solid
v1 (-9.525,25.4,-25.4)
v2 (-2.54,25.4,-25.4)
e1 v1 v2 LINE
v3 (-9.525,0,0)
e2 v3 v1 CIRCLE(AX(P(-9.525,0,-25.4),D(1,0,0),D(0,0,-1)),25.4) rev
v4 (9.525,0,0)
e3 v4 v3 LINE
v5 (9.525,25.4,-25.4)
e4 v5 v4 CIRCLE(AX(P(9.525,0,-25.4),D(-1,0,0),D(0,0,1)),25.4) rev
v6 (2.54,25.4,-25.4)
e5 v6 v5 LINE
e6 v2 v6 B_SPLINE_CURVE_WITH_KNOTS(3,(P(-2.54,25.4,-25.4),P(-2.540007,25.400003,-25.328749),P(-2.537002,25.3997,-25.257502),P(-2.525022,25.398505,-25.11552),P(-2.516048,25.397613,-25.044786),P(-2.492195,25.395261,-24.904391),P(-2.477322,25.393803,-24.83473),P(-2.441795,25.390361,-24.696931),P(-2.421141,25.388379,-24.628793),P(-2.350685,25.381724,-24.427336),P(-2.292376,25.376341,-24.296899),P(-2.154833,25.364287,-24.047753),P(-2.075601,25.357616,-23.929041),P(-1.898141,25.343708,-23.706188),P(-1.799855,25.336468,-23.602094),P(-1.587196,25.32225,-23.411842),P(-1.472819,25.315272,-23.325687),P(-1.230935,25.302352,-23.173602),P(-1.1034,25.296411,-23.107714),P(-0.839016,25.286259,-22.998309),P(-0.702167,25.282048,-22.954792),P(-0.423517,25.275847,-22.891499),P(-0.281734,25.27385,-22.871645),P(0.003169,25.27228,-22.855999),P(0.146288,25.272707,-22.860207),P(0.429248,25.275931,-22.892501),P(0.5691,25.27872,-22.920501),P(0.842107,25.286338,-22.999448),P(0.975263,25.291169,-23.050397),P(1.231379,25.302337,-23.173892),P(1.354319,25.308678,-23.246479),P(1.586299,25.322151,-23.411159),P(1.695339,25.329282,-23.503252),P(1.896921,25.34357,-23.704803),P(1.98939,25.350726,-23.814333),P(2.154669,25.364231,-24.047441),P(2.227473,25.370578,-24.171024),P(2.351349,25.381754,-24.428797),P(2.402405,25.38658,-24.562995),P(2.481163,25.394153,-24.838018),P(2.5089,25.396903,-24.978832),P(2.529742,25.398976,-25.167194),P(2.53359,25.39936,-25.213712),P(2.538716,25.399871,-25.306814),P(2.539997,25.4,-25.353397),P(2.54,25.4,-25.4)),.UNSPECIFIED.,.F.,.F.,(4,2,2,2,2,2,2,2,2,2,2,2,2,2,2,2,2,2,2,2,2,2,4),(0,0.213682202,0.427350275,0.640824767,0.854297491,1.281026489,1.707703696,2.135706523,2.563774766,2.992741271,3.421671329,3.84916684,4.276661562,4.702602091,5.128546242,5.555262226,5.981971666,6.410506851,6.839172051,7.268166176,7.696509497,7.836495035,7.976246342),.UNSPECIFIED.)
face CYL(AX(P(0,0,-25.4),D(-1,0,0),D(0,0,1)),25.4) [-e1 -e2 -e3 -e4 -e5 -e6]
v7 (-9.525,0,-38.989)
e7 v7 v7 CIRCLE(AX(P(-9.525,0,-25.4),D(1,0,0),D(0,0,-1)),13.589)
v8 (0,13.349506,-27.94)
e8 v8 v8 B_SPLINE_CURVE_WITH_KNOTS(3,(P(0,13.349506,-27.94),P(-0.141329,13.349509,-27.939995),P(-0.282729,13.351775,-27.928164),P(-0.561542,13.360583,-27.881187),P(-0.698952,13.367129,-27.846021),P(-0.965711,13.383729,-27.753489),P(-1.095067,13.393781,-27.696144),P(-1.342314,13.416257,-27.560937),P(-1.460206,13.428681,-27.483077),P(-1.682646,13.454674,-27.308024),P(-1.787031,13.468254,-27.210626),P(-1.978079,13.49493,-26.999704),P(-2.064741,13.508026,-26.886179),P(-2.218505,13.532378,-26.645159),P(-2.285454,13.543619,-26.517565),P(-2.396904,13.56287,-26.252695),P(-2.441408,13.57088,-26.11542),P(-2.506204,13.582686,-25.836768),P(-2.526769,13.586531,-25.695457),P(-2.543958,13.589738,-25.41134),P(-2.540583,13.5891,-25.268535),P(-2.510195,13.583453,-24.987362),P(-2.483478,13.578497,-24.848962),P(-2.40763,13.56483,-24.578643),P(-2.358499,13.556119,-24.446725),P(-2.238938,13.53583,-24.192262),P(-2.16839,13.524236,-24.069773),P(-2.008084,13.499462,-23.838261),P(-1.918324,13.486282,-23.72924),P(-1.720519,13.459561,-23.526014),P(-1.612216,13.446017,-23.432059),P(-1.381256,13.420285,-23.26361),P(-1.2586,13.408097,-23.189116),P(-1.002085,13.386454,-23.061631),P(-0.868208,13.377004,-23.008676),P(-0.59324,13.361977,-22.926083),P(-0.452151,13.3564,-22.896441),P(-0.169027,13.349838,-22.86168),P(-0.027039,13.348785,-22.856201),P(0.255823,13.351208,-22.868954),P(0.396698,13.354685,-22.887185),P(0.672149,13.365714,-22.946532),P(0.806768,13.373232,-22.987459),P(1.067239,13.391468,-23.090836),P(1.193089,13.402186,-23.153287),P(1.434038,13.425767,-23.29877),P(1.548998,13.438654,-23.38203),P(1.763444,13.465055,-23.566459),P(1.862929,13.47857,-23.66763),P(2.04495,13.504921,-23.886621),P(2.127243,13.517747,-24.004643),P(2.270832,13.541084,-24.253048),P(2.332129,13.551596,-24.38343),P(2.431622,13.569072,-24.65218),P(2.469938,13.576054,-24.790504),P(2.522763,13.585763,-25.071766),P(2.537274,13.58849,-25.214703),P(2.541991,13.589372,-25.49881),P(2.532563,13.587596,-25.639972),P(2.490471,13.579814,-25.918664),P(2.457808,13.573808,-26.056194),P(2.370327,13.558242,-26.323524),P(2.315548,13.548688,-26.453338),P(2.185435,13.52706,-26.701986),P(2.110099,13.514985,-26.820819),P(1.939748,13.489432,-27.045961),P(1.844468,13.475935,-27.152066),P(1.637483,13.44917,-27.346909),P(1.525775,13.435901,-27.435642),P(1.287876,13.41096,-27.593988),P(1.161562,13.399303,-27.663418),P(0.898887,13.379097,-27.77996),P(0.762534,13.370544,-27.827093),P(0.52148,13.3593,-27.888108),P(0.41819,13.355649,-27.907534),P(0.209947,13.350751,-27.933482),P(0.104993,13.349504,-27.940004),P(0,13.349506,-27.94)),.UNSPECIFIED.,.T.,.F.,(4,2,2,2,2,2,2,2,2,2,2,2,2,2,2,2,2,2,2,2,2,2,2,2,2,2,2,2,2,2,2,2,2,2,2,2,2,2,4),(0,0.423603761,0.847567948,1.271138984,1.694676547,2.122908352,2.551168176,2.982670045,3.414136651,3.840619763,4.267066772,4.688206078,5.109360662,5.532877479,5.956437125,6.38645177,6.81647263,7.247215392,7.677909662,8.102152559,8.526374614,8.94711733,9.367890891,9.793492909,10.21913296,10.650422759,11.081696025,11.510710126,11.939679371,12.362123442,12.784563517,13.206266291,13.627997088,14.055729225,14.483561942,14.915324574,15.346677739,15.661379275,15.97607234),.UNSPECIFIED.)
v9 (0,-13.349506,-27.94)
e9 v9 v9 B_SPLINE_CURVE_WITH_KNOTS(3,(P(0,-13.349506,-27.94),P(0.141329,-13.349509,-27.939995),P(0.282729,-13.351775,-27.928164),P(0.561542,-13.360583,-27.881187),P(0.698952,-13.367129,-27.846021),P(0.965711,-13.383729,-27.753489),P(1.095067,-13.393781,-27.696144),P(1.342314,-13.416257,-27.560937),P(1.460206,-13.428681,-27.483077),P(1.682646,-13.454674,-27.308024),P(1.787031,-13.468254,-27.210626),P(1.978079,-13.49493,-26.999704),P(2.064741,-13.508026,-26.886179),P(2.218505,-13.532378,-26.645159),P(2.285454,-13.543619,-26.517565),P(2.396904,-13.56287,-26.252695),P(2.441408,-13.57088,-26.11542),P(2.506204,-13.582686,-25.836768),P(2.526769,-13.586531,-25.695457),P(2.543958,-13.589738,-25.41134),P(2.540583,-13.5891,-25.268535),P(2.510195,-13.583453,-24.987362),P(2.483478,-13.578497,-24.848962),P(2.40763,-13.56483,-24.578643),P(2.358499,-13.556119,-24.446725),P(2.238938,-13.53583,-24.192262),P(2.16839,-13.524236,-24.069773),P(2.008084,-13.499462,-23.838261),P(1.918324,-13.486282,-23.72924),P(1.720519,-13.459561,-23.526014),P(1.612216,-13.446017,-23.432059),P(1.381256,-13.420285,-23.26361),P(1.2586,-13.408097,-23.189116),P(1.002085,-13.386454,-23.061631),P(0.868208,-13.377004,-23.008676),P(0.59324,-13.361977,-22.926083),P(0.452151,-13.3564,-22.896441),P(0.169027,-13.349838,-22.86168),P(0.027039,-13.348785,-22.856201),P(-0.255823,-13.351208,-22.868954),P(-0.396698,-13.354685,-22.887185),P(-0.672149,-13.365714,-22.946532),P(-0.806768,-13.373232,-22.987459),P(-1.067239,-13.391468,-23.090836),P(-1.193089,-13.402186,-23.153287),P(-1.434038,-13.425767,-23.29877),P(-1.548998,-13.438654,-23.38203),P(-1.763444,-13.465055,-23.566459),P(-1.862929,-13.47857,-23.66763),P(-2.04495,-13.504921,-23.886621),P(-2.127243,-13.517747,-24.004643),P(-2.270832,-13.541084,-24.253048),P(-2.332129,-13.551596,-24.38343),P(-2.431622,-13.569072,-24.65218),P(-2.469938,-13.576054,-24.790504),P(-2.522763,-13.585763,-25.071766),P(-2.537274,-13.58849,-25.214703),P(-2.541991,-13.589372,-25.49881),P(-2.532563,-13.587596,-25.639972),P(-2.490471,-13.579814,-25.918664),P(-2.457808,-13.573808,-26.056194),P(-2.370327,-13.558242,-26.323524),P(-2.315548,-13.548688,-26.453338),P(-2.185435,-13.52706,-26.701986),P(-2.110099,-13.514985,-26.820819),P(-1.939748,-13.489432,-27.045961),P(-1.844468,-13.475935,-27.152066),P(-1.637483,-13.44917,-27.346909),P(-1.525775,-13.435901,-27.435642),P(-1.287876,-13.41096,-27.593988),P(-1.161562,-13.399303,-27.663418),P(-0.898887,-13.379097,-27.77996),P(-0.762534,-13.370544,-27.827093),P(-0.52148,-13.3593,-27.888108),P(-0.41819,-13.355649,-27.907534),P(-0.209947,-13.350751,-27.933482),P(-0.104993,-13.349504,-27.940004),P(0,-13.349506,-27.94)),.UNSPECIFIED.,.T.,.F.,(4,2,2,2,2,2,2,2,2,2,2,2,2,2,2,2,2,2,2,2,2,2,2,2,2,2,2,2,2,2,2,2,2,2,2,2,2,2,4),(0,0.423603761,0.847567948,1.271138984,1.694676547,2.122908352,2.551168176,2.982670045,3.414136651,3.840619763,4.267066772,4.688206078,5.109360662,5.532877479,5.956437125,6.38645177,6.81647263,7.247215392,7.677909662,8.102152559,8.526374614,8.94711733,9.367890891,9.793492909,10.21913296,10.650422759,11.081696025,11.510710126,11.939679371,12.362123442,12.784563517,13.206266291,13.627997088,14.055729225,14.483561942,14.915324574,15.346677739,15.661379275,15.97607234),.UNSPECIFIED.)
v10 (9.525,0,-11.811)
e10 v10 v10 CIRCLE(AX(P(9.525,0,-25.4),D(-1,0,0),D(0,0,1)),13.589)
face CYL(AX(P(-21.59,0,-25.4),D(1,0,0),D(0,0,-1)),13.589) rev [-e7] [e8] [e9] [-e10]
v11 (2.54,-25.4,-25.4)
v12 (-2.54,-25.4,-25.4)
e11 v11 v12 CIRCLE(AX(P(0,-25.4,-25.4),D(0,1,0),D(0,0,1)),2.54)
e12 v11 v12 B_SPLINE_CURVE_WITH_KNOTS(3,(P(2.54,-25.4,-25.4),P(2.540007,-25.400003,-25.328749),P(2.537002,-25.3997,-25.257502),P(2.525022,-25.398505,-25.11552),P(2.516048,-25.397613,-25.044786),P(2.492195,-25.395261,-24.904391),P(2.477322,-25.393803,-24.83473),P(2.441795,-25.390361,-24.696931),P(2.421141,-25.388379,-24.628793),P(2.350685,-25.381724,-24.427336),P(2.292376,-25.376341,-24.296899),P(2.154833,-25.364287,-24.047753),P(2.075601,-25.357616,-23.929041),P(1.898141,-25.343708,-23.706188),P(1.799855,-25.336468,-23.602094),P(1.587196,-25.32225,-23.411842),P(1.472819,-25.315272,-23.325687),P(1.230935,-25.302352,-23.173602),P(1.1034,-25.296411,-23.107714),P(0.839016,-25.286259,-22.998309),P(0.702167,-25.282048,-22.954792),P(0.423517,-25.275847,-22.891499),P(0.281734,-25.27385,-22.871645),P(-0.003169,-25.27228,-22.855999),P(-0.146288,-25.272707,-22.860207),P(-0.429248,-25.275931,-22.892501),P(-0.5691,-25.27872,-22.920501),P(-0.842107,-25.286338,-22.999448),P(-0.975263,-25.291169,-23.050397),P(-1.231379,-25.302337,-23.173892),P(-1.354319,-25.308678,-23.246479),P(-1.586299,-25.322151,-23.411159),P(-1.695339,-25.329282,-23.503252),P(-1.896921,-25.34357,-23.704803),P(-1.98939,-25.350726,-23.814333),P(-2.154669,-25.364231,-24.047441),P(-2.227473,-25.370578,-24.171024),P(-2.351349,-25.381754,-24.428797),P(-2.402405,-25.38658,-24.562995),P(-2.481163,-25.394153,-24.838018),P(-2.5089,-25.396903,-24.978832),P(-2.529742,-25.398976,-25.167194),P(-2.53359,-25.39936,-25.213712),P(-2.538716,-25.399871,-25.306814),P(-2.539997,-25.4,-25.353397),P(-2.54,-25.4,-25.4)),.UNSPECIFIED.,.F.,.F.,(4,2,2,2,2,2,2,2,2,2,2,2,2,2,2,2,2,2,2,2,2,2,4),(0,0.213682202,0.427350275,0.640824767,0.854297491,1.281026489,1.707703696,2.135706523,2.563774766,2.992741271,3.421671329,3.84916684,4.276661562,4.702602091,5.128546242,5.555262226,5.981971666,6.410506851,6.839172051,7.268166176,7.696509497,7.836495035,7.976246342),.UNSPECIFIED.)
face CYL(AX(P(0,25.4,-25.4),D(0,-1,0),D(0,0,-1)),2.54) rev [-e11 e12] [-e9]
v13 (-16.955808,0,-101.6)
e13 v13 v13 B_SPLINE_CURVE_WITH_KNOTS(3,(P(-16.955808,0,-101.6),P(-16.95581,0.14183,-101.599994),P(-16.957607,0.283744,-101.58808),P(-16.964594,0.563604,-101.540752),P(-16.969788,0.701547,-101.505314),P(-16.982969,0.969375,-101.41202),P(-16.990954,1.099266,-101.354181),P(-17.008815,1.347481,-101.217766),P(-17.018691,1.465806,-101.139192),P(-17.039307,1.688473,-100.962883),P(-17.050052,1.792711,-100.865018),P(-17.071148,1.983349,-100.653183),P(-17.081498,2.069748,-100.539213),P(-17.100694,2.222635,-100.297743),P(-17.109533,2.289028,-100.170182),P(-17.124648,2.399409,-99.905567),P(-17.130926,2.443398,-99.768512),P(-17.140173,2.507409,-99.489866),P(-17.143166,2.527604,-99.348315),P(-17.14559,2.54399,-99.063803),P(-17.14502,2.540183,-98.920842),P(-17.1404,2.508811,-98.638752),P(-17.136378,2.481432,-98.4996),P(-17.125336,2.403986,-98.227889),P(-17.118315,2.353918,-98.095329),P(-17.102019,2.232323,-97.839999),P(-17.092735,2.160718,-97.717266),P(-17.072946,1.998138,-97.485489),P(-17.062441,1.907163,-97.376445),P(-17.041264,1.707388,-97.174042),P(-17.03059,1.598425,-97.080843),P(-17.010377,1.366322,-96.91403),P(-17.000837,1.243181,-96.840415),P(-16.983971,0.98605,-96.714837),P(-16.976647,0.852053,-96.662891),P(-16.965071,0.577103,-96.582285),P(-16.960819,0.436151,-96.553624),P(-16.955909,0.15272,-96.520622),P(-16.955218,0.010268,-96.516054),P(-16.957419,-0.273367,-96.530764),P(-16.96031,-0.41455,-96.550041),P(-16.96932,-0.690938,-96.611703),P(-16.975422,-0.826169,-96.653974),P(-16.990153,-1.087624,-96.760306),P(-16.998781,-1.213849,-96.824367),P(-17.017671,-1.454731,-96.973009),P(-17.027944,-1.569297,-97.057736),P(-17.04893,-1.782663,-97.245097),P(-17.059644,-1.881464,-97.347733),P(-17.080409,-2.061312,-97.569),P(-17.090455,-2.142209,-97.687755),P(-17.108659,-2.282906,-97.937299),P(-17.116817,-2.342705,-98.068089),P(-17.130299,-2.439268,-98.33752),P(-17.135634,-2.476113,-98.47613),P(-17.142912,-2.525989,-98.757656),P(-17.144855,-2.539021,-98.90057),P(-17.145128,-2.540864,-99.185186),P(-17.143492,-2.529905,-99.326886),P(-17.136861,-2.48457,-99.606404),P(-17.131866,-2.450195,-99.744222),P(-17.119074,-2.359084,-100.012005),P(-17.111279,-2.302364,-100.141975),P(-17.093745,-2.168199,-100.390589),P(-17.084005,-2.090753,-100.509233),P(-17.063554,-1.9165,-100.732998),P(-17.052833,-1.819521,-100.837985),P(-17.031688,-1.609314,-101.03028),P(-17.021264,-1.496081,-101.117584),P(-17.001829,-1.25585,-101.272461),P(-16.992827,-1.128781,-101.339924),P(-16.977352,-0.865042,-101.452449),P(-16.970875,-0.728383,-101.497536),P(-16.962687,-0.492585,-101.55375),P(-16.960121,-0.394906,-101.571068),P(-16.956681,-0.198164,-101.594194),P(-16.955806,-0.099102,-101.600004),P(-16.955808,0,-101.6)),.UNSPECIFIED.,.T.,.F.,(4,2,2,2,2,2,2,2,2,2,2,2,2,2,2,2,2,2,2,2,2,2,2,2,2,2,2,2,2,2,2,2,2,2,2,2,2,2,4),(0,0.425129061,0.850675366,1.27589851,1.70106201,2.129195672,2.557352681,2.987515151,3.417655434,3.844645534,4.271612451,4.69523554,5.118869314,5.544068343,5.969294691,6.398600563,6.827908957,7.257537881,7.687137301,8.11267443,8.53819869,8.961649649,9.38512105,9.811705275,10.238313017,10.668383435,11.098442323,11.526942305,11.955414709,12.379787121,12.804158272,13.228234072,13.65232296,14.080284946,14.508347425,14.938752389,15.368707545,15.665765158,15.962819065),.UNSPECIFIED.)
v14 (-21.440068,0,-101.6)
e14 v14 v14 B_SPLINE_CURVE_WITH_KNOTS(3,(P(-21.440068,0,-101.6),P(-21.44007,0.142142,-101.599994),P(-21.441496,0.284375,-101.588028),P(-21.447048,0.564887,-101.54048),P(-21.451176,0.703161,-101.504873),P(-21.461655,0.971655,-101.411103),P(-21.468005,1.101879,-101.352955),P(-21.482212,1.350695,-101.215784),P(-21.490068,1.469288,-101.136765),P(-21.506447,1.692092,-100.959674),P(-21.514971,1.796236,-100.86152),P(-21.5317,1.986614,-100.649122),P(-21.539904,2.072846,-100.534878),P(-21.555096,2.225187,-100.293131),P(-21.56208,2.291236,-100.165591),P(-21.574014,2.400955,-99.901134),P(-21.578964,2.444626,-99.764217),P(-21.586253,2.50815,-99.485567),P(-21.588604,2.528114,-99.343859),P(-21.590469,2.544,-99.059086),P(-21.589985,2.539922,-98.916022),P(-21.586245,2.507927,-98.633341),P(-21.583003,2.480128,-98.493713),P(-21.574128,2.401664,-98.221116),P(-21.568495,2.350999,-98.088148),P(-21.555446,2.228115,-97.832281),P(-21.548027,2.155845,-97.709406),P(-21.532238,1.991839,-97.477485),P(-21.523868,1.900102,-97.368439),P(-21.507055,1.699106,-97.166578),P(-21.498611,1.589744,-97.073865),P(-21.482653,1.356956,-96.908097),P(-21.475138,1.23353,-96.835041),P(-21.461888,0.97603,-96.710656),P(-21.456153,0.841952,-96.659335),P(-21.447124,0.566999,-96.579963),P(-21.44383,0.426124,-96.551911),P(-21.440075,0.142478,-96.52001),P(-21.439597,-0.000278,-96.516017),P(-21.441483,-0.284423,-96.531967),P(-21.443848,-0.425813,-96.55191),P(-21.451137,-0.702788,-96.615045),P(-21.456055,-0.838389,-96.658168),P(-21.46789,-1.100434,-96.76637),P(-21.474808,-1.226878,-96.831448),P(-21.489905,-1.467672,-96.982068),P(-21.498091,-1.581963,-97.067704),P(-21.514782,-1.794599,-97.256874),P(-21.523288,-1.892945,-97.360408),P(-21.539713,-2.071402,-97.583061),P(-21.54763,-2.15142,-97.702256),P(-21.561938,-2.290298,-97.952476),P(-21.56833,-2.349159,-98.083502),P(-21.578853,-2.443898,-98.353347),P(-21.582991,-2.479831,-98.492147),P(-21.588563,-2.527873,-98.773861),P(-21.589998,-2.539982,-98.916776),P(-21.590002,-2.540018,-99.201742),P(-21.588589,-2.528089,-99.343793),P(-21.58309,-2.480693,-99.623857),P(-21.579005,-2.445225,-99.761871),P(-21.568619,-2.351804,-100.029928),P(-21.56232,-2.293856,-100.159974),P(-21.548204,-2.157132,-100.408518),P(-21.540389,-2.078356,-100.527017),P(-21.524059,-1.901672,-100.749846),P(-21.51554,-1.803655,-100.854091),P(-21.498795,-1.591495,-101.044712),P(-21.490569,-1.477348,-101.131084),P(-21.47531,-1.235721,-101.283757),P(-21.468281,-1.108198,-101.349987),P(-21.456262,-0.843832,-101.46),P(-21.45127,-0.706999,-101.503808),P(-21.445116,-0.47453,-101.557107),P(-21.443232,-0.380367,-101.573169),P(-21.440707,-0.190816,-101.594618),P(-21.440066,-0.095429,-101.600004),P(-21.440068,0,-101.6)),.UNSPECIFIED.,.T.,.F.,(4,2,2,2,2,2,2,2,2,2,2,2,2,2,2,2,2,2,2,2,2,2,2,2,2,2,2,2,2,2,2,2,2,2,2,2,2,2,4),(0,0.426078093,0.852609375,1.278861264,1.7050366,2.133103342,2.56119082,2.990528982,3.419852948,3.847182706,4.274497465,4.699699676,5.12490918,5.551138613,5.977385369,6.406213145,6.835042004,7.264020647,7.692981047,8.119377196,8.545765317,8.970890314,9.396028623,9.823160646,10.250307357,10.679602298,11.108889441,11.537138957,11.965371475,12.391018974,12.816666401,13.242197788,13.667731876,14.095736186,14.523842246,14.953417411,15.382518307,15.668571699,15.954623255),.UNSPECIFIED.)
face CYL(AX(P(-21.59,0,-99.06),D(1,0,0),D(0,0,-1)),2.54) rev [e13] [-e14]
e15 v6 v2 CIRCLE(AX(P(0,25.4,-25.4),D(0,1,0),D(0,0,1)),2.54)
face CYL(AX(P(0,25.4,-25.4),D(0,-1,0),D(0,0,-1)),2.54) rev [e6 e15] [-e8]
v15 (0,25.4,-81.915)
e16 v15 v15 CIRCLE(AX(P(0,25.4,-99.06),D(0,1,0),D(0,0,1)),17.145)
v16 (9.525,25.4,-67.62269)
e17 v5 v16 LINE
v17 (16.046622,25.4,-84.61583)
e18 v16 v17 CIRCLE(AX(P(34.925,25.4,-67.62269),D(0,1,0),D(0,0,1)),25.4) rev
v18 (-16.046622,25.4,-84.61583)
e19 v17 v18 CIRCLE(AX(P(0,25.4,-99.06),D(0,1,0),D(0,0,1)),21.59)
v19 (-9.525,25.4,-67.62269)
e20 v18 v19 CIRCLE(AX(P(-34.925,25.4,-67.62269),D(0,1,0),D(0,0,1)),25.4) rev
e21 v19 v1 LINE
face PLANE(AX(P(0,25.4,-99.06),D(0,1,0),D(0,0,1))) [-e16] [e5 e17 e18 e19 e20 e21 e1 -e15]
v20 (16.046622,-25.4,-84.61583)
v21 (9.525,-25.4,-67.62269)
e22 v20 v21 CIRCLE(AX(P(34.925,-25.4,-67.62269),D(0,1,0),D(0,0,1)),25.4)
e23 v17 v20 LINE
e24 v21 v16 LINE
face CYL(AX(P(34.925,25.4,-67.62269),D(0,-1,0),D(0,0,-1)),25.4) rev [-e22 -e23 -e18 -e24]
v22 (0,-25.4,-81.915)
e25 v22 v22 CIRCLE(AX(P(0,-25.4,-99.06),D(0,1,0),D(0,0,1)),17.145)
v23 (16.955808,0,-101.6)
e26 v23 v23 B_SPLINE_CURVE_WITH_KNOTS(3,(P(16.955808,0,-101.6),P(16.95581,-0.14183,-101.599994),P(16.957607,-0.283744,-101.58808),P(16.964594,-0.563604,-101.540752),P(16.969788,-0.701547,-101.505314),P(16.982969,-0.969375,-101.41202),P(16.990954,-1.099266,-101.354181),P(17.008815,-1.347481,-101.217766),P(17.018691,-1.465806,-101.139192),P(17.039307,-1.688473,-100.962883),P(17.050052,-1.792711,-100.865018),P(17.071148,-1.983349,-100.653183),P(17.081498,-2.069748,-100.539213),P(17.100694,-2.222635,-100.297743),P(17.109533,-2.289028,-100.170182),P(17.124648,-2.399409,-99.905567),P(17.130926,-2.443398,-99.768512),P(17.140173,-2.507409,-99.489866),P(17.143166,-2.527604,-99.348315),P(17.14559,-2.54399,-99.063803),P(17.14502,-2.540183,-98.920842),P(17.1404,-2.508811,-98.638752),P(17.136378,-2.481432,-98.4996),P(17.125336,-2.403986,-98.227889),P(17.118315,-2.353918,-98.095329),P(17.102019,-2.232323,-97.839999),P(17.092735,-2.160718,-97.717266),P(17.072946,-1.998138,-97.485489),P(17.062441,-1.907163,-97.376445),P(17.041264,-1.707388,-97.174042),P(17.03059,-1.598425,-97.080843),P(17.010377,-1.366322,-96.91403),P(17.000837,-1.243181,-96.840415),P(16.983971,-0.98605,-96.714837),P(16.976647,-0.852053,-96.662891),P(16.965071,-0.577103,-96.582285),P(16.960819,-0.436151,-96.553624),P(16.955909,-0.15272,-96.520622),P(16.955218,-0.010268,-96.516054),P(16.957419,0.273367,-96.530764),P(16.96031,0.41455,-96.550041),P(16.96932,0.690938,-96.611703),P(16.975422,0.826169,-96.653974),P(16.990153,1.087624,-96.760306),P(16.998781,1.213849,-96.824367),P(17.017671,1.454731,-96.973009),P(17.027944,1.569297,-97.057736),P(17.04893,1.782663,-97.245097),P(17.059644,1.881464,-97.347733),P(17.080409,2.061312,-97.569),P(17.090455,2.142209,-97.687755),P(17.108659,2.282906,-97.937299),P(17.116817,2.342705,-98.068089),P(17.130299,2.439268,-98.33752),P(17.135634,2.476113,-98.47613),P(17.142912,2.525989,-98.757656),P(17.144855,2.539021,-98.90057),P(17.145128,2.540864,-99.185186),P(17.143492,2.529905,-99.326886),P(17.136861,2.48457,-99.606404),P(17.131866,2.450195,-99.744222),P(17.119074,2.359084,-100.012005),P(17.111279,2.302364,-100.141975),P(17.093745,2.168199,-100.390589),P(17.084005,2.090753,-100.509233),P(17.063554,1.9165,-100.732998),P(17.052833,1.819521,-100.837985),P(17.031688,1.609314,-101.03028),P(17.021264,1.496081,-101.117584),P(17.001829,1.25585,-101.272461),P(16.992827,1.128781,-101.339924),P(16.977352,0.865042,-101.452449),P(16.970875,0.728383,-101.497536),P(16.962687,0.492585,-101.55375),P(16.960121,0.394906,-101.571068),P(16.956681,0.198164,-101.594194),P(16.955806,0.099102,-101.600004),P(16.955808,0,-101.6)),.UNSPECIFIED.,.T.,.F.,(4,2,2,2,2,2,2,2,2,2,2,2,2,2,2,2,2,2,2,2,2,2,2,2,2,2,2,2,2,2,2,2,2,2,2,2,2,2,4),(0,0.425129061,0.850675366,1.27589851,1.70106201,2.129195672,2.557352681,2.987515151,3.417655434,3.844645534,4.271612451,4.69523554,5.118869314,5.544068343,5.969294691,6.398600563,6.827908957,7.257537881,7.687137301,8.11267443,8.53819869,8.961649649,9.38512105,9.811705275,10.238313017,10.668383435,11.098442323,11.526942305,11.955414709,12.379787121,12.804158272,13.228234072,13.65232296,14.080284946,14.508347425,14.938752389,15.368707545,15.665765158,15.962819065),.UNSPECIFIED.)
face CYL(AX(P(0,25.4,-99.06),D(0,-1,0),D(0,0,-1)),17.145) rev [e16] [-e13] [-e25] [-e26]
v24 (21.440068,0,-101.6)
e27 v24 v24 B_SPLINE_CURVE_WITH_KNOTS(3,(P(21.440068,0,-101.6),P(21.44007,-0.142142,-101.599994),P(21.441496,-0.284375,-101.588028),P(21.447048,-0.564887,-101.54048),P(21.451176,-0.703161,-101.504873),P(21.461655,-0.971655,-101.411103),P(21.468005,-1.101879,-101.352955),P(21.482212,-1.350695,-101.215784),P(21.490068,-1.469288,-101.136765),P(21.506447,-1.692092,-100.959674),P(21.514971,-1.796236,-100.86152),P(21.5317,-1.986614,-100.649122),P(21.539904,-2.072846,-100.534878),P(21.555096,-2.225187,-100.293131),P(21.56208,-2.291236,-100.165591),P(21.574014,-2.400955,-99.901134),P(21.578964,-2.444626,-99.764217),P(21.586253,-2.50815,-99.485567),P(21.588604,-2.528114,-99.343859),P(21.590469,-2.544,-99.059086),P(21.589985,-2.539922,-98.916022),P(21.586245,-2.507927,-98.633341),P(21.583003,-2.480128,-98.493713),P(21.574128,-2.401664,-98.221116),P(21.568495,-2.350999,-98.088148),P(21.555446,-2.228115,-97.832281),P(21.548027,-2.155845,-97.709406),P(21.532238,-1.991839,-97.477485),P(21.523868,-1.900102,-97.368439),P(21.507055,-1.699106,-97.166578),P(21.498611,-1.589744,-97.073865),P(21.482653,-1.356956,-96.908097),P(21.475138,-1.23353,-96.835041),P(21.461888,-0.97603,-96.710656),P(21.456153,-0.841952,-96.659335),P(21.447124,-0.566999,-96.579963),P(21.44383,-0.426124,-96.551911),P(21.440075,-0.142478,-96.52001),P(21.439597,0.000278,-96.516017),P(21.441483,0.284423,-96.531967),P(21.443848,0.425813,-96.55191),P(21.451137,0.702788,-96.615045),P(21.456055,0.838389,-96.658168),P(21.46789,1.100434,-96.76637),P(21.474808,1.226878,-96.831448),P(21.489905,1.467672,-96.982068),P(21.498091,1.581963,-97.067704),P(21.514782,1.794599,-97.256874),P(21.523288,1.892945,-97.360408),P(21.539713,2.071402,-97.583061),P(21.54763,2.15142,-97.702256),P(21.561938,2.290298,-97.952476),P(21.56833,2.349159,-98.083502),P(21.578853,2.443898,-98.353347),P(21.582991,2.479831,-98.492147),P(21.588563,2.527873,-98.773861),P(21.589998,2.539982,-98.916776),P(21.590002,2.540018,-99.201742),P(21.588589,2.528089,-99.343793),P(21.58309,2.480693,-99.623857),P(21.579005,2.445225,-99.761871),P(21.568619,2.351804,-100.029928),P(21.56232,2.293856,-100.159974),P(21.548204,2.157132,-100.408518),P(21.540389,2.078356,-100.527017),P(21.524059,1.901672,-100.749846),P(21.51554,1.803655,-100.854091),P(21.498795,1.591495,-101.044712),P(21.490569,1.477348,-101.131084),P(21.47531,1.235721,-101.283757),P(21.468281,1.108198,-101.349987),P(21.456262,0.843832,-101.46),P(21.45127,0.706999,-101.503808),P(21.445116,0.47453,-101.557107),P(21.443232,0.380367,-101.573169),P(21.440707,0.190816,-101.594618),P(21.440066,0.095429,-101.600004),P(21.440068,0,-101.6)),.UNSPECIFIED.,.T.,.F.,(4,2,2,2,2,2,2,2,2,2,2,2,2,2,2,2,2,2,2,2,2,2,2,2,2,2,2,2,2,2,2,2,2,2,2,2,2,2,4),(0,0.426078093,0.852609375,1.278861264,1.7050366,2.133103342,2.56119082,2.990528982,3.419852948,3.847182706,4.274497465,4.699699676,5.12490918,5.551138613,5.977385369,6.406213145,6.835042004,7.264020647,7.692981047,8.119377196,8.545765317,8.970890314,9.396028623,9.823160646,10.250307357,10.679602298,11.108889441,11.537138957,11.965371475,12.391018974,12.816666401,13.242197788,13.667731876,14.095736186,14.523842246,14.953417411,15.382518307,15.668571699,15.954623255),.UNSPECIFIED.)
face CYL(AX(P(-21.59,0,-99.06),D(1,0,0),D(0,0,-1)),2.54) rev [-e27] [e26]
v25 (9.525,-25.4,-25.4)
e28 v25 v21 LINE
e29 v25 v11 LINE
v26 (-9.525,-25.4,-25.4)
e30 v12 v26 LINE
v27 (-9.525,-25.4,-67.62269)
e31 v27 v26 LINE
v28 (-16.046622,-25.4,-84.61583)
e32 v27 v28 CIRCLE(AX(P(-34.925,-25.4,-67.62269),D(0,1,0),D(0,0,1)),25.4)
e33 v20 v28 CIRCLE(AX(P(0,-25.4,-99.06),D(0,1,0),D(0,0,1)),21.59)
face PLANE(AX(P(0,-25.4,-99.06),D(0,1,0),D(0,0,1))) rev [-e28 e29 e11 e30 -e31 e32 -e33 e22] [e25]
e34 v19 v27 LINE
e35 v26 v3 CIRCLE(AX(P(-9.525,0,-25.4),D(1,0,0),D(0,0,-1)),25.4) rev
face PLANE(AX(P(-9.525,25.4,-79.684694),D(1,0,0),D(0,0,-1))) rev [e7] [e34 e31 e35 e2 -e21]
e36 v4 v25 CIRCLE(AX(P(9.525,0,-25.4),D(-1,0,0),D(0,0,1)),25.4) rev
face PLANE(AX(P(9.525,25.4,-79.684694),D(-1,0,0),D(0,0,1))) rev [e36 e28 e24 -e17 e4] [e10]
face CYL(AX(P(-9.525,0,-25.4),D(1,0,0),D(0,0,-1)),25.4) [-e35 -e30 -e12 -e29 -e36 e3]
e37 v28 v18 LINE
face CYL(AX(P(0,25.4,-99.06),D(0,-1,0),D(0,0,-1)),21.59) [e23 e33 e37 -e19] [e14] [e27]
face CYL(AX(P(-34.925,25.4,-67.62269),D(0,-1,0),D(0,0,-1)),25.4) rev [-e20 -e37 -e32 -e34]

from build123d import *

# Parameters (mm, degrees)
SKETCH1_R               = 17.145
SKETCH1_R_2             = 2.54
BOSS_EXTRUDE1_DEPTH     = 25.4
CUT_EXTRUDE1_DEPTH      = 128.160236415
CUT_EXTRUDE1_DEPTH_BACK = 128.160236415
SKETCH2_R               = 13.589
SKETCH2_R_2             = 2.54
FILLET1_R               = 25.4
FILLET2_R               = 25.4


with BuildPart() as part:
    # Sketch1 → Boss-Extrude1 (new, symmetric)
    with BuildSketch(Plane(origin=(0, 0, 0), x_dir=(1, 0, 0), z_dir=(0, 1, 0))):
        with BuildLine():
            Line((-9.525, 79.684694196), (-9.525, 0))
            Line((-9.525, 0), (9.525, 0))
            Line((9.525, 0), (9.525, 79.684694196))
            ThreePointArc((9.525, 79.684694196), (0, 120.65), (-9.525, 79.684694196))
        make_face()
        with Locations(Location((0, 99.06, 0), (0, 0, 270))):
            Circle(SKETCH1_R, mode=Mode.SUBTRACT)
        with Locations(Location((0, 25.4, 0), (0, 0, 270))):
            Circle(SKETCH1_R_2, mode=Mode.SUBTRACT)
    extrude(amount=BOSS_EXTRUDE1_DEPTH, both=True)

    # Sketch2 → Cut-Extrude1 (cut, two sides: drawn at the far end of the back side and taken through both)
    with BuildSketch(Plane(origin=(9.525, 0, 0), x_dir=(0, 0, -1), z_dir=(1, 0, 0)).offset(-CUT_EXTRUDE1_DEPTH_BACK)):
        with Locations((25.4, 0)):
            Circle(SKETCH2_R)
        with Locations((99.06, 0)):
            Circle(SKETCH2_R_2)
    extrude(amount=CUT_EXTRUDE1_DEPTH + CUT_EXTRUDE1_DEPTH_BACK, mode=Mode.SUBTRACT)

    # Fillet1
    # the kernel refuses this fillet: 25.4 mm, written as the material it takes off along each edge
    with BuildSketch(Plane(origin=(-73.025, -25.4, 0), x_dir=(0, 0, -1), z_dir=(1, 0, 0)), Plane(origin=(-73.025, 25.4, 0), x_dir=(0, -1, 0), z_dir=(1, 0, 0))) as fillet1_piece_1:
        with BuildLine():
            CenterArc((FILLET1_R, FILLET1_R), FILLET1_R, 180, 90)
            Line((0, FILLET1_R), (0, 0))
            Line((0, 0), (FILLET1_R, 0))
        make_face()
    extrude(amount=146.05, mode=Mode.SUBTRACT)

    # Fillet2
    fillet2_edges = [part.edges().sort_by_distance(p)[0] for p in [
        (9.525, 0, -79.684694196),
        (-9.525, 0, -79.684694196),
    ]]
    fillet(fillet2_edges, radius=FILLET2_R)


solid = part.part
